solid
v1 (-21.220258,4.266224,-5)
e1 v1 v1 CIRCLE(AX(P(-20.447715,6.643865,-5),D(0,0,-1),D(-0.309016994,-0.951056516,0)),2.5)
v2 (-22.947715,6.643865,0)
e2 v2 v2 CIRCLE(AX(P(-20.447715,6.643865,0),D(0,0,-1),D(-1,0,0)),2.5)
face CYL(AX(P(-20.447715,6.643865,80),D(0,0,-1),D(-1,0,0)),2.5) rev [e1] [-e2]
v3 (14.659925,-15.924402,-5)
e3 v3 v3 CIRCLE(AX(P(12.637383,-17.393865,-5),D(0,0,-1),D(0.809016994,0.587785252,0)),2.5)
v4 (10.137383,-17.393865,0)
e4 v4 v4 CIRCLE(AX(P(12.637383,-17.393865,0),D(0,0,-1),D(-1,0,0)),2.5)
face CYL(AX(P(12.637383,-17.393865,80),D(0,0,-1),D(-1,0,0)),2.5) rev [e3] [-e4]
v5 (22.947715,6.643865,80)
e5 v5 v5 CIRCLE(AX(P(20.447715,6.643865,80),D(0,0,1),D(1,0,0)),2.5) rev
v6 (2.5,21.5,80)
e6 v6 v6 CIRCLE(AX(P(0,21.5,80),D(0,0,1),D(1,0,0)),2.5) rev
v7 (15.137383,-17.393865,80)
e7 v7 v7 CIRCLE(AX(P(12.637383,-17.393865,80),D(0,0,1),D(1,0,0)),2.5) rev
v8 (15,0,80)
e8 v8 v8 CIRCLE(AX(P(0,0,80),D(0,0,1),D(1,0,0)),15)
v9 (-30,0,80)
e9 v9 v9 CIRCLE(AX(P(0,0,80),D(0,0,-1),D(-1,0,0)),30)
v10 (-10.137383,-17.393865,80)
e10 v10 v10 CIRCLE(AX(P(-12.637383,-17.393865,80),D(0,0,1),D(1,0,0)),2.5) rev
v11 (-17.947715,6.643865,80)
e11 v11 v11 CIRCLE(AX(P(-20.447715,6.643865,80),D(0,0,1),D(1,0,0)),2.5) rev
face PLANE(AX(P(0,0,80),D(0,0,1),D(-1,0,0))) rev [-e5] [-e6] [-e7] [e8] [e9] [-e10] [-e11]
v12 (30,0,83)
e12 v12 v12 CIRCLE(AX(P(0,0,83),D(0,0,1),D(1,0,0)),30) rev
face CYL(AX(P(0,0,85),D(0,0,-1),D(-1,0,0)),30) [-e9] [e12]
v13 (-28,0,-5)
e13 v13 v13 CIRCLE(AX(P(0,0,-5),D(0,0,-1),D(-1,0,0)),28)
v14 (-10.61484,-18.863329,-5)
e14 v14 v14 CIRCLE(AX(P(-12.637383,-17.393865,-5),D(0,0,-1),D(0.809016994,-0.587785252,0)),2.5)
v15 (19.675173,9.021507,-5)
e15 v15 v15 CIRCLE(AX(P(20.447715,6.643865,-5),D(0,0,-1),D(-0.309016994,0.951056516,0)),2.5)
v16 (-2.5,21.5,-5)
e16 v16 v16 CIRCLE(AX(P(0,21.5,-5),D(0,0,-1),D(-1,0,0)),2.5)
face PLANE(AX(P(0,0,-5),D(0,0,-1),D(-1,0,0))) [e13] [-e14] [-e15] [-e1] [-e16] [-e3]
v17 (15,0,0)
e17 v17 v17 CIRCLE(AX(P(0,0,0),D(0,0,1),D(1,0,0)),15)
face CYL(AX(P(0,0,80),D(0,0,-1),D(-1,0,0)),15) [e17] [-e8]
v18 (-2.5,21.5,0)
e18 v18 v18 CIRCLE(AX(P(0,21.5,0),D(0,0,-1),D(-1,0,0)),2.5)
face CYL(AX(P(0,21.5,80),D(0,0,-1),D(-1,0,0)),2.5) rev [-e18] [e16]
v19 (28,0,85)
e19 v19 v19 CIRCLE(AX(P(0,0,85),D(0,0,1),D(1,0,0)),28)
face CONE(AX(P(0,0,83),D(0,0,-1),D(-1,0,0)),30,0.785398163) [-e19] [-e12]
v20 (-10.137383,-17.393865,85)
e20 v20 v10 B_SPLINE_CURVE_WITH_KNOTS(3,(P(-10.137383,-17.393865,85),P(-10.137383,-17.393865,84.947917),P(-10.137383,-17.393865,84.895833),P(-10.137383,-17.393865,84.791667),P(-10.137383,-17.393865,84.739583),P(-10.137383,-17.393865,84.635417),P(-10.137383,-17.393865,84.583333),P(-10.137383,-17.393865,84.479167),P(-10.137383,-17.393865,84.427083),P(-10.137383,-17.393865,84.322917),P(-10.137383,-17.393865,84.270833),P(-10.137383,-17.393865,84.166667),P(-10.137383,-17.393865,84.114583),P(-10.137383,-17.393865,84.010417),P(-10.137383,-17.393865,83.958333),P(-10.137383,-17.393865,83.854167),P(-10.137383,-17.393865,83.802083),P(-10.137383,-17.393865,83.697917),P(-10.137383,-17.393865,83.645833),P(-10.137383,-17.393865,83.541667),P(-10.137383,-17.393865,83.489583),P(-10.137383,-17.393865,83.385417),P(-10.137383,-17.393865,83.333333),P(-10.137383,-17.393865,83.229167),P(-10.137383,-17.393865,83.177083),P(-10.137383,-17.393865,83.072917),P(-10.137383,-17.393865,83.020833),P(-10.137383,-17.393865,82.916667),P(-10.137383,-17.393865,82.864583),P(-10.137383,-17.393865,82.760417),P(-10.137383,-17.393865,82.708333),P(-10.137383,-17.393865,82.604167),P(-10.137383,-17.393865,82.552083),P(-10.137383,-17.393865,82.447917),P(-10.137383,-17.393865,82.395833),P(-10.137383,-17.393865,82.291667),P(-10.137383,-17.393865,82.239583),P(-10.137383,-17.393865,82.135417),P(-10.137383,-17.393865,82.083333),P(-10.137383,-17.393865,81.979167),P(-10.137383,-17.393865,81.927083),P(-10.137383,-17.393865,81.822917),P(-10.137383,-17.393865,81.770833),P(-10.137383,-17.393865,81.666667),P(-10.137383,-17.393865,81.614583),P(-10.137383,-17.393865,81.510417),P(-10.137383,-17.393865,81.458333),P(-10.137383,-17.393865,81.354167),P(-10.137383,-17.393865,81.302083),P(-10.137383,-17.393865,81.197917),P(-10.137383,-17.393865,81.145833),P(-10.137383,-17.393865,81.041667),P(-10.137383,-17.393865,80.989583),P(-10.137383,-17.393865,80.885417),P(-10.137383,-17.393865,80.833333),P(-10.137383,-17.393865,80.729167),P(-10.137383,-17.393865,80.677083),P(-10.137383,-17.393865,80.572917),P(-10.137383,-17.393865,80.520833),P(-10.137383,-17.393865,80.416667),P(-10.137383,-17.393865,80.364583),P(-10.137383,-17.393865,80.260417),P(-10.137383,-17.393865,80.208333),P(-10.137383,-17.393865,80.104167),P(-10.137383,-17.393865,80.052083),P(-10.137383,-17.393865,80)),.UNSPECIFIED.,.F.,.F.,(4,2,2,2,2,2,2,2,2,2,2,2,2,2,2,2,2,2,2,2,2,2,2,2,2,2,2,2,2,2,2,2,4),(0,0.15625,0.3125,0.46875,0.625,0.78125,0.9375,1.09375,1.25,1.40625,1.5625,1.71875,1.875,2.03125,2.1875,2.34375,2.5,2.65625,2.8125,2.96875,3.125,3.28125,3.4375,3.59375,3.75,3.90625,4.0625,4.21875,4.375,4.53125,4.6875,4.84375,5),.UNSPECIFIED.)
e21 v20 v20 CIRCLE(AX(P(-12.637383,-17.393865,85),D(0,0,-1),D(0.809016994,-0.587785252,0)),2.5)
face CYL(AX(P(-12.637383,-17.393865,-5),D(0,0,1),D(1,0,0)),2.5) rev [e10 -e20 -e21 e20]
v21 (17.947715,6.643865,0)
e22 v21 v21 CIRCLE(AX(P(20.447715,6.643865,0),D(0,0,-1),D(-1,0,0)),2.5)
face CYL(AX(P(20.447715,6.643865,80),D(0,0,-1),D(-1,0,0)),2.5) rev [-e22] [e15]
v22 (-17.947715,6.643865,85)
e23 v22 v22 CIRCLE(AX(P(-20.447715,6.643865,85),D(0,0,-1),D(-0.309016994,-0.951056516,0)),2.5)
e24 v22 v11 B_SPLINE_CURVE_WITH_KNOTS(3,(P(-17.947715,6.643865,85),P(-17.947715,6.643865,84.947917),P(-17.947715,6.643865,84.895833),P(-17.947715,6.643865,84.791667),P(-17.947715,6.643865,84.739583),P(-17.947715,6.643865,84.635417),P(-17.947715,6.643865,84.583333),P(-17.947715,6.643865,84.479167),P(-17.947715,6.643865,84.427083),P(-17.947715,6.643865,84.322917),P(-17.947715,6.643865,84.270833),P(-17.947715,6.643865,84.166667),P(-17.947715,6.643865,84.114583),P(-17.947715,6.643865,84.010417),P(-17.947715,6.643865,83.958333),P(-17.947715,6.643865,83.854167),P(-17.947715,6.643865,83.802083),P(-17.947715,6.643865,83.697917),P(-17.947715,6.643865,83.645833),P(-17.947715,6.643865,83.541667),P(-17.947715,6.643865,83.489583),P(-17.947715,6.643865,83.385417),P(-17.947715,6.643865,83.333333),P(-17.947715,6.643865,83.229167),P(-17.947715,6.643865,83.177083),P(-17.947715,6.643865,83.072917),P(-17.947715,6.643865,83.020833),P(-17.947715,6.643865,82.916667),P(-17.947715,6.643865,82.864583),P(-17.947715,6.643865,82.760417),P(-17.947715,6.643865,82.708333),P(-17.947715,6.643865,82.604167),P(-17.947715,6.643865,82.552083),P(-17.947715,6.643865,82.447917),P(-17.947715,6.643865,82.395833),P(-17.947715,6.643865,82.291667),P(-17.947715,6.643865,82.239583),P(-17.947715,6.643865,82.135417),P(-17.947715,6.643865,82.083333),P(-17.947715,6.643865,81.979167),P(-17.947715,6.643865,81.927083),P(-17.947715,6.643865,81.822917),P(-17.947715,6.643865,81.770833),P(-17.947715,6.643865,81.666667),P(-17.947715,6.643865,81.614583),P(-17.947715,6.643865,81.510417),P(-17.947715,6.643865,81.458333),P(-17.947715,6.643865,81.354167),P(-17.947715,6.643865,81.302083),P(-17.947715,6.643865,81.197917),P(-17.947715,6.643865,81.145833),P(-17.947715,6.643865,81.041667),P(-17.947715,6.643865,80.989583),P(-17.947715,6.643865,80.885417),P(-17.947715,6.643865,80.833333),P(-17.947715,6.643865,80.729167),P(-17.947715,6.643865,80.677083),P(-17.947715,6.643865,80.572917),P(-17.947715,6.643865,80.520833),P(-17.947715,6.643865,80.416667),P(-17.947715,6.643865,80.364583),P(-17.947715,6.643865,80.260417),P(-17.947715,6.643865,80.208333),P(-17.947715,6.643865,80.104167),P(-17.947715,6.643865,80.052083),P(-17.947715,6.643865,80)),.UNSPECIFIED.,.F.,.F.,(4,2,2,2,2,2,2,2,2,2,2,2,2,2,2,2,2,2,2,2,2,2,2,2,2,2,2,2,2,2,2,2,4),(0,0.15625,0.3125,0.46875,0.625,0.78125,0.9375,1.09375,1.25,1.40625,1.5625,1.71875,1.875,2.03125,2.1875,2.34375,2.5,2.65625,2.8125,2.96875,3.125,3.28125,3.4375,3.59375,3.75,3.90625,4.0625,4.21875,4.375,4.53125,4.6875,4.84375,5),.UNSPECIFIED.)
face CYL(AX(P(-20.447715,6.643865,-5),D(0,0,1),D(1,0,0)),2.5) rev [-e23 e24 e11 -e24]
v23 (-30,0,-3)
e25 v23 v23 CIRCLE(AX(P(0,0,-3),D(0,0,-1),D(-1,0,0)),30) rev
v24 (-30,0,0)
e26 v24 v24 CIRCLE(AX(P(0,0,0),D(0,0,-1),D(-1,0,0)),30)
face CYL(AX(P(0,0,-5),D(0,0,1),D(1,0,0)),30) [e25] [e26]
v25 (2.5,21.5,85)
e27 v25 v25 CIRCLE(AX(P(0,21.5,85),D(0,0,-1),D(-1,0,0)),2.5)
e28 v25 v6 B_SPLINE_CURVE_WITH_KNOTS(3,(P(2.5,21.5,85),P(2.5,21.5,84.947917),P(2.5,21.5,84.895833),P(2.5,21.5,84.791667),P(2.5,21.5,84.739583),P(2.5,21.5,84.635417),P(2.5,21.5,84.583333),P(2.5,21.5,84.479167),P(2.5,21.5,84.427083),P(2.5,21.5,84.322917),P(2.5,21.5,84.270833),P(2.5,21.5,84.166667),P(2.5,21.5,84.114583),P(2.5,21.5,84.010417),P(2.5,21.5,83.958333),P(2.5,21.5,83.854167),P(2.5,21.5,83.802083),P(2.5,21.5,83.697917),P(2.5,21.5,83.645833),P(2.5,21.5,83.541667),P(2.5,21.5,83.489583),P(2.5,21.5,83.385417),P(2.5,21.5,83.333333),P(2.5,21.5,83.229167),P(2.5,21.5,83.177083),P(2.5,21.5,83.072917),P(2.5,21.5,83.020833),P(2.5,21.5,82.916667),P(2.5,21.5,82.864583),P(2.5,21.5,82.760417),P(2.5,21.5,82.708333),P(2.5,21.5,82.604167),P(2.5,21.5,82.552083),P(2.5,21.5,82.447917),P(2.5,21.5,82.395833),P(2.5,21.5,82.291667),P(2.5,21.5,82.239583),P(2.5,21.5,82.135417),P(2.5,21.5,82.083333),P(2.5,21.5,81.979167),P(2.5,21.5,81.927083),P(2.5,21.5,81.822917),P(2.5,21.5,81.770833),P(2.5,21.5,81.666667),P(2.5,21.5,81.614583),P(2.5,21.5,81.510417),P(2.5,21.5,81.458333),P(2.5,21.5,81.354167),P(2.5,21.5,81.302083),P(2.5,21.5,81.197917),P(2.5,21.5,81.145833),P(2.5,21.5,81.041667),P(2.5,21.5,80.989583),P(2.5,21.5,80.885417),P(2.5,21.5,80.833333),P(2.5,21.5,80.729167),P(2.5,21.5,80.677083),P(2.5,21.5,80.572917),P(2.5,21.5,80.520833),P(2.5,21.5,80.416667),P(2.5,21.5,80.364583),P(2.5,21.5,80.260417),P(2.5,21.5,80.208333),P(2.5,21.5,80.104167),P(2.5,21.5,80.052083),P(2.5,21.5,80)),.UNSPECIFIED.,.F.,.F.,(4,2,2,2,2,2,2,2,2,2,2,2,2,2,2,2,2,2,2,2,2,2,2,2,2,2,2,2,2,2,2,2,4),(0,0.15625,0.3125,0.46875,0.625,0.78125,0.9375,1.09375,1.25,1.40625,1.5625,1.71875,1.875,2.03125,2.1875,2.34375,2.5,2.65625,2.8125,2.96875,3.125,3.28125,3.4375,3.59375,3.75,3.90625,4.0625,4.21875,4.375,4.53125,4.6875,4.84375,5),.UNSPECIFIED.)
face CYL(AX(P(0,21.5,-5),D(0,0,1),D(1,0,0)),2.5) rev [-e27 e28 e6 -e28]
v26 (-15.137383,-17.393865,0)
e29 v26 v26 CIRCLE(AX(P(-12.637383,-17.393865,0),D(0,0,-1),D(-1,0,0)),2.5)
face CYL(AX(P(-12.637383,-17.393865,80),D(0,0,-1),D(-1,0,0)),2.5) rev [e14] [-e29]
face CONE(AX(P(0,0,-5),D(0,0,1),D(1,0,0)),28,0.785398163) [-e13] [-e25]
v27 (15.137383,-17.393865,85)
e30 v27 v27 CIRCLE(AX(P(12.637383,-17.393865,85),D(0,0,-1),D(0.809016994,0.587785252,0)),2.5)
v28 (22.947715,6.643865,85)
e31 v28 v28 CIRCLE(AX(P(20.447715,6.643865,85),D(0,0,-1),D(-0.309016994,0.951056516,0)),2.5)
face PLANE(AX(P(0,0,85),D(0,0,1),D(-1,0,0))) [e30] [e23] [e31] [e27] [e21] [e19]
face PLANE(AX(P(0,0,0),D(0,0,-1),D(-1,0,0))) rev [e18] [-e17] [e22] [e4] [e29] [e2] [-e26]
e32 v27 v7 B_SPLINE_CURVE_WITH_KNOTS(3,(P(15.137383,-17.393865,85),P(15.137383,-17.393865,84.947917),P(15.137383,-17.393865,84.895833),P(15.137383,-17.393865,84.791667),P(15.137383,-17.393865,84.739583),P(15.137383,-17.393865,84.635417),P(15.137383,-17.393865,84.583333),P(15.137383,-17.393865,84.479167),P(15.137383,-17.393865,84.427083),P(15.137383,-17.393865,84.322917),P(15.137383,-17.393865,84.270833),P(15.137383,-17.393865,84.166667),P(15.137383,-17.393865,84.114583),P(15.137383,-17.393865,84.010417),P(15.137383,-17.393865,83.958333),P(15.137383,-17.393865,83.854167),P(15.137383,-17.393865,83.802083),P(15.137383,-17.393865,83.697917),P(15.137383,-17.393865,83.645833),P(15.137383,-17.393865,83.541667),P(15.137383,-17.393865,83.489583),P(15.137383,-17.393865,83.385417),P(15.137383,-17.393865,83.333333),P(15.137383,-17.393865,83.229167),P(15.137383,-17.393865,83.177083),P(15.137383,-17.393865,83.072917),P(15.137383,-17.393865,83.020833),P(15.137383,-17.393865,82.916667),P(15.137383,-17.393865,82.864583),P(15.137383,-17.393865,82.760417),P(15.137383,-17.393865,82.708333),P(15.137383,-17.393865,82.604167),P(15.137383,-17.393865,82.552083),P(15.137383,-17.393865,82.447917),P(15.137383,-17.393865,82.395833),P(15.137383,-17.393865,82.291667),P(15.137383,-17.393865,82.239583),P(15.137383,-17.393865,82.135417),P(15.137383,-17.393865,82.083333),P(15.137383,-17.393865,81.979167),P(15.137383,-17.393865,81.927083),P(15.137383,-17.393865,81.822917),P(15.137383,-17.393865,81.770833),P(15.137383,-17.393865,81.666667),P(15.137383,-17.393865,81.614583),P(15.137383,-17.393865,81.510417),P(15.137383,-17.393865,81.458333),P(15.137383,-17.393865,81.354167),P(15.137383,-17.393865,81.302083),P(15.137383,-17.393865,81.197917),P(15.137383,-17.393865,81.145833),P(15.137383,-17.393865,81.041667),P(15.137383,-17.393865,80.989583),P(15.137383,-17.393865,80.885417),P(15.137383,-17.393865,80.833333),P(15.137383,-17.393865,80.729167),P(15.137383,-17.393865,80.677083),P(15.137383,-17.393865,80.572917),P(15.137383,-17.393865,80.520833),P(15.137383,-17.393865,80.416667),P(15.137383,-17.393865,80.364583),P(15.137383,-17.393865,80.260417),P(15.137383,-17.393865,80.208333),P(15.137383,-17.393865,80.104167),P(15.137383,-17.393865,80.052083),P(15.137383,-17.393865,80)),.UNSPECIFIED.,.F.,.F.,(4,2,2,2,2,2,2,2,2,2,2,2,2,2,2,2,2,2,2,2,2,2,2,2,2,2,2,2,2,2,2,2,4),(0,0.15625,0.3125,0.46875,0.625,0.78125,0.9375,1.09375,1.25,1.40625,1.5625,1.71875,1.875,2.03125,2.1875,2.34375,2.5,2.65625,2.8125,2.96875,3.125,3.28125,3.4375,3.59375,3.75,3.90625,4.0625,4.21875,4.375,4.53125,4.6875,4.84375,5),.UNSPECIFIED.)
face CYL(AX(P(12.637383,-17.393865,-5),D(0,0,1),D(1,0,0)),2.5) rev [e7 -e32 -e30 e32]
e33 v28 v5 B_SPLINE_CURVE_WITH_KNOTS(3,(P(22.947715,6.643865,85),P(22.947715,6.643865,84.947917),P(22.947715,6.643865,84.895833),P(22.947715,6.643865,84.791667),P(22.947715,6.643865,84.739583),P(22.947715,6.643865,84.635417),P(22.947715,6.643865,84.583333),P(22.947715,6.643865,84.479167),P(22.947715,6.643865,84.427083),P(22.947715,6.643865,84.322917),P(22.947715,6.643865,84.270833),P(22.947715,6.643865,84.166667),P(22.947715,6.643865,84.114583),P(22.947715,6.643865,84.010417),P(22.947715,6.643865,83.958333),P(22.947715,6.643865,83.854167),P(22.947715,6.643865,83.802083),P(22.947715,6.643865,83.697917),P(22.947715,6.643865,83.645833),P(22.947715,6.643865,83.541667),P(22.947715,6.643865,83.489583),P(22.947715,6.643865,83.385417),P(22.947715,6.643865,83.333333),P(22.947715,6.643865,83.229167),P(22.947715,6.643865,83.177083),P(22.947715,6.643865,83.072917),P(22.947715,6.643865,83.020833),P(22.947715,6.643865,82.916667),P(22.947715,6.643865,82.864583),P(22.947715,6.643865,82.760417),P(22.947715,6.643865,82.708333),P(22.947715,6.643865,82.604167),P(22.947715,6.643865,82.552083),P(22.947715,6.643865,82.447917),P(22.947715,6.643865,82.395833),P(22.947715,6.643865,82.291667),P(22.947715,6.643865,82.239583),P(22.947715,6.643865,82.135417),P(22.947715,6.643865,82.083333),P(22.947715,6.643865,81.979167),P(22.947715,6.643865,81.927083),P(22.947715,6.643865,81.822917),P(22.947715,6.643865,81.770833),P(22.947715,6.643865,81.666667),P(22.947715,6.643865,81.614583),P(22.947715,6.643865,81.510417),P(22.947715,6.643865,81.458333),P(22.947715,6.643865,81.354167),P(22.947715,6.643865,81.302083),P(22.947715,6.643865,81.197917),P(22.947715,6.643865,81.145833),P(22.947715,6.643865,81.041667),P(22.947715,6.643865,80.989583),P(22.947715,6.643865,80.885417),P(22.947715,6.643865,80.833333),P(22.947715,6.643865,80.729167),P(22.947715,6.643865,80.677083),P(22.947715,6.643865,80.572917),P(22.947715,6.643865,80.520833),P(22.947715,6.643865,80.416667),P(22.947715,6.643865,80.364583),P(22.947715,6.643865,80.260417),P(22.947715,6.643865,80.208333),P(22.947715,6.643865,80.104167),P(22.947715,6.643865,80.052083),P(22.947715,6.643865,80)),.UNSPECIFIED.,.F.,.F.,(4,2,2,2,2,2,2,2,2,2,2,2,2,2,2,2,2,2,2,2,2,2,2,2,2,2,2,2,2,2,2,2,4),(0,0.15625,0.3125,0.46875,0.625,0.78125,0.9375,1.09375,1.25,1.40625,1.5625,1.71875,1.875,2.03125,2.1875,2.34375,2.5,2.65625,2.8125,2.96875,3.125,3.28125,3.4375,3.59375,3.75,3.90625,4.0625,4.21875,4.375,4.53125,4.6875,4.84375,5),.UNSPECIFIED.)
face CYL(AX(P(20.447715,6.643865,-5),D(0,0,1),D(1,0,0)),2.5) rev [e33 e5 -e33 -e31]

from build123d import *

# Parameters (mm, degrees)
SKETCH1_R                = 15
BOSS_EXTRUDE1_DEPTH      = 80
SKETCH2_R                = 30
BOSS_EXTRUDE2_DEPTH      = 5
CHAMFER1_SIZE            = 2
SKETCH3_R                = 2.5
CUT_EXTRUDE1_DEPTH       = 96
CIRPATTERN5_COUNT        = 5
MIRROR3_COPY_1_SKETCH_R  = 2.5
MIRROR3_COPY_1_DEPTH     = 96
MIRROR3_COPY_2_SKETCH_R  = 2.5
MIRROR3_COPY_2_DEPTH     = 96
MIRROR3_COPY_3_SKETCH_R  = 2.5
MIRROR3_COPY_3_DEPTH     = 96
MIRROR3_COPY_4_SKETCH_R  = 2.5
MIRROR3_COPY_4_DEPTH     = 96
MIRROR3_COPY_5_SKETCH_R  = 2.5
MIRROR3_COPY_5_DEPTH     = 96
CHAMFER1_OF_MIRROR3_SIZE = 2


with BuildPart() as part:
    # Sketch1 → Boss-Extrude1 (new body)
    with BuildSketch(Plane.XY):
        Circle(SKETCH1_R)
    extrude(amount=BOSS_EXTRUDE1_DEPTH)

    # Sketch2 → Boss-Extrude2 (add)
    with BuildSketch(Plane(origin=(0, 0, 0), x_dir=(-1, 0, 0), z_dir=(0, 0, -1))):
        Circle(SKETCH2_R)
    boss_extrude2 = extrude(amount=BOSS_EXTRUDE2_DEPTH)

    # Chamfer1
    chamfer1_edges = [part.edges().sort_by_distance(p)[0] for p in [
        (30, 0, -5),
    ]]
    chamfer(chamfer1_edges, length=CHAMFER1_SIZE)

    # Sketch3 → Cut-Extrude1 (cut, through all)
    with BuildSketch(Plane(origin=(0, 0, -5), x_dir=(-1, 0, 0), z_dir=(0, 0, -1))):
        with Locations((0, 21.5)):
            Circle(SKETCH3_R)
    cut_extrude1 = extrude(amount=-CUT_EXTRUDE1_DEPTH, mode=Mode.SUBTRACT)

    # CirPattern5: Cut-Extrude1 ×5 about axis
    cirpattern5_axis = Axis((0, 0, -5), (0, 0, 1))
    for i in range(1, CIRPATTERN5_COUNT):
        add(cut_extrude1.rotate(cirpattern5_axis, i * 360 / CIRPATTERN5_COUNT), mode=Mode.SUBTRACT)

    # Mirror3: Boss-Extrude2 across plane
    add(boss_extrude2.mirror(Plane.XY.offset(40)))

    # Mirror3 copy 1 sketch → Mirror3 copy 1 (cut, through all)
    with BuildSketch(Plane(origin=(0, 0, 85), x_dir=(-0.30901699437494745, -0.9510565162951535, 0), z_dir=(0, 0, 1))):
        with Locations((0, -21.5)):
            Circle(MIRROR3_COPY_1_SKETCH_R)
    extrude(amount=-MIRROR3_COPY_1_DEPTH, mode=Mode.SUBTRACT)

    # Mirror3 copy 2 sketch → Mirror3 copy 2 (cut, through all)
    with BuildSketch(Plane(origin=(0, 0, 85), x_dir=(0.8090169943749473, -0.5877852522924732, 0), z_dir=(0, 0, 1))):
        with Locations((0, -21.5)):
            Circle(MIRROR3_COPY_2_SKETCH_R)
    extrude(amount=-MIRROR3_COPY_2_DEPTH, mode=Mode.SUBTRACT)

    # Mirror3 copy 3 sketch → Mirror3 copy 3 (cut, through all)
    with BuildSketch(Plane(origin=(0, 0, 85), x_dir=(0.8090169943749476, 0.587785252292473, 0), z_dir=(0, 0, 1))):
        with Locations((0, -21.5)):
            Circle(MIRROR3_COPY_3_SKETCH_R)
    extrude(amount=-MIRROR3_COPY_3_DEPTH, mode=Mode.SUBTRACT)

    # Mirror3 copy 4 sketch → Mirror3 copy 4 (cut, through all)
    with BuildSketch(Plane(origin=(0, 0, 85), x_dir=(-0.30901699437494723, 0.9510565162951536, 0), z_dir=(0, 0, 1))):
        with Locations((0, -21.5)):
            Circle(MIRROR3_COPY_4_SKETCH_R)
    extrude(amount=-MIRROR3_COPY_4_DEPTH, mode=Mode.SUBTRACT)

    # Mirror3 copy 5 sketch → Mirror3 copy 5 (cut, through all)
    with BuildSketch(Plane(origin=(0, 0, 85), x_dir=(-1, 0, 0), z_dir=(0, 0, 1))):
        with Locations((0, -21.5)):
            Circle(MIRROR3_COPY_5_SKETCH_R)
    extrude(amount=-MIRROR3_COPY_5_DEPTH, mode=Mode.SUBTRACT)

    # Chamfer1 of Mirror3
    chamfer1_of_mirror3_edges = [part.edges().sort_by_distance(p)[0] for p in [
        (30, 0, 85),
    ]]
    chamfer(chamfer1_of_mirror3_edges, length=CHAMFER1_OF_MIRROR3_SIZE)


solid = part.part
